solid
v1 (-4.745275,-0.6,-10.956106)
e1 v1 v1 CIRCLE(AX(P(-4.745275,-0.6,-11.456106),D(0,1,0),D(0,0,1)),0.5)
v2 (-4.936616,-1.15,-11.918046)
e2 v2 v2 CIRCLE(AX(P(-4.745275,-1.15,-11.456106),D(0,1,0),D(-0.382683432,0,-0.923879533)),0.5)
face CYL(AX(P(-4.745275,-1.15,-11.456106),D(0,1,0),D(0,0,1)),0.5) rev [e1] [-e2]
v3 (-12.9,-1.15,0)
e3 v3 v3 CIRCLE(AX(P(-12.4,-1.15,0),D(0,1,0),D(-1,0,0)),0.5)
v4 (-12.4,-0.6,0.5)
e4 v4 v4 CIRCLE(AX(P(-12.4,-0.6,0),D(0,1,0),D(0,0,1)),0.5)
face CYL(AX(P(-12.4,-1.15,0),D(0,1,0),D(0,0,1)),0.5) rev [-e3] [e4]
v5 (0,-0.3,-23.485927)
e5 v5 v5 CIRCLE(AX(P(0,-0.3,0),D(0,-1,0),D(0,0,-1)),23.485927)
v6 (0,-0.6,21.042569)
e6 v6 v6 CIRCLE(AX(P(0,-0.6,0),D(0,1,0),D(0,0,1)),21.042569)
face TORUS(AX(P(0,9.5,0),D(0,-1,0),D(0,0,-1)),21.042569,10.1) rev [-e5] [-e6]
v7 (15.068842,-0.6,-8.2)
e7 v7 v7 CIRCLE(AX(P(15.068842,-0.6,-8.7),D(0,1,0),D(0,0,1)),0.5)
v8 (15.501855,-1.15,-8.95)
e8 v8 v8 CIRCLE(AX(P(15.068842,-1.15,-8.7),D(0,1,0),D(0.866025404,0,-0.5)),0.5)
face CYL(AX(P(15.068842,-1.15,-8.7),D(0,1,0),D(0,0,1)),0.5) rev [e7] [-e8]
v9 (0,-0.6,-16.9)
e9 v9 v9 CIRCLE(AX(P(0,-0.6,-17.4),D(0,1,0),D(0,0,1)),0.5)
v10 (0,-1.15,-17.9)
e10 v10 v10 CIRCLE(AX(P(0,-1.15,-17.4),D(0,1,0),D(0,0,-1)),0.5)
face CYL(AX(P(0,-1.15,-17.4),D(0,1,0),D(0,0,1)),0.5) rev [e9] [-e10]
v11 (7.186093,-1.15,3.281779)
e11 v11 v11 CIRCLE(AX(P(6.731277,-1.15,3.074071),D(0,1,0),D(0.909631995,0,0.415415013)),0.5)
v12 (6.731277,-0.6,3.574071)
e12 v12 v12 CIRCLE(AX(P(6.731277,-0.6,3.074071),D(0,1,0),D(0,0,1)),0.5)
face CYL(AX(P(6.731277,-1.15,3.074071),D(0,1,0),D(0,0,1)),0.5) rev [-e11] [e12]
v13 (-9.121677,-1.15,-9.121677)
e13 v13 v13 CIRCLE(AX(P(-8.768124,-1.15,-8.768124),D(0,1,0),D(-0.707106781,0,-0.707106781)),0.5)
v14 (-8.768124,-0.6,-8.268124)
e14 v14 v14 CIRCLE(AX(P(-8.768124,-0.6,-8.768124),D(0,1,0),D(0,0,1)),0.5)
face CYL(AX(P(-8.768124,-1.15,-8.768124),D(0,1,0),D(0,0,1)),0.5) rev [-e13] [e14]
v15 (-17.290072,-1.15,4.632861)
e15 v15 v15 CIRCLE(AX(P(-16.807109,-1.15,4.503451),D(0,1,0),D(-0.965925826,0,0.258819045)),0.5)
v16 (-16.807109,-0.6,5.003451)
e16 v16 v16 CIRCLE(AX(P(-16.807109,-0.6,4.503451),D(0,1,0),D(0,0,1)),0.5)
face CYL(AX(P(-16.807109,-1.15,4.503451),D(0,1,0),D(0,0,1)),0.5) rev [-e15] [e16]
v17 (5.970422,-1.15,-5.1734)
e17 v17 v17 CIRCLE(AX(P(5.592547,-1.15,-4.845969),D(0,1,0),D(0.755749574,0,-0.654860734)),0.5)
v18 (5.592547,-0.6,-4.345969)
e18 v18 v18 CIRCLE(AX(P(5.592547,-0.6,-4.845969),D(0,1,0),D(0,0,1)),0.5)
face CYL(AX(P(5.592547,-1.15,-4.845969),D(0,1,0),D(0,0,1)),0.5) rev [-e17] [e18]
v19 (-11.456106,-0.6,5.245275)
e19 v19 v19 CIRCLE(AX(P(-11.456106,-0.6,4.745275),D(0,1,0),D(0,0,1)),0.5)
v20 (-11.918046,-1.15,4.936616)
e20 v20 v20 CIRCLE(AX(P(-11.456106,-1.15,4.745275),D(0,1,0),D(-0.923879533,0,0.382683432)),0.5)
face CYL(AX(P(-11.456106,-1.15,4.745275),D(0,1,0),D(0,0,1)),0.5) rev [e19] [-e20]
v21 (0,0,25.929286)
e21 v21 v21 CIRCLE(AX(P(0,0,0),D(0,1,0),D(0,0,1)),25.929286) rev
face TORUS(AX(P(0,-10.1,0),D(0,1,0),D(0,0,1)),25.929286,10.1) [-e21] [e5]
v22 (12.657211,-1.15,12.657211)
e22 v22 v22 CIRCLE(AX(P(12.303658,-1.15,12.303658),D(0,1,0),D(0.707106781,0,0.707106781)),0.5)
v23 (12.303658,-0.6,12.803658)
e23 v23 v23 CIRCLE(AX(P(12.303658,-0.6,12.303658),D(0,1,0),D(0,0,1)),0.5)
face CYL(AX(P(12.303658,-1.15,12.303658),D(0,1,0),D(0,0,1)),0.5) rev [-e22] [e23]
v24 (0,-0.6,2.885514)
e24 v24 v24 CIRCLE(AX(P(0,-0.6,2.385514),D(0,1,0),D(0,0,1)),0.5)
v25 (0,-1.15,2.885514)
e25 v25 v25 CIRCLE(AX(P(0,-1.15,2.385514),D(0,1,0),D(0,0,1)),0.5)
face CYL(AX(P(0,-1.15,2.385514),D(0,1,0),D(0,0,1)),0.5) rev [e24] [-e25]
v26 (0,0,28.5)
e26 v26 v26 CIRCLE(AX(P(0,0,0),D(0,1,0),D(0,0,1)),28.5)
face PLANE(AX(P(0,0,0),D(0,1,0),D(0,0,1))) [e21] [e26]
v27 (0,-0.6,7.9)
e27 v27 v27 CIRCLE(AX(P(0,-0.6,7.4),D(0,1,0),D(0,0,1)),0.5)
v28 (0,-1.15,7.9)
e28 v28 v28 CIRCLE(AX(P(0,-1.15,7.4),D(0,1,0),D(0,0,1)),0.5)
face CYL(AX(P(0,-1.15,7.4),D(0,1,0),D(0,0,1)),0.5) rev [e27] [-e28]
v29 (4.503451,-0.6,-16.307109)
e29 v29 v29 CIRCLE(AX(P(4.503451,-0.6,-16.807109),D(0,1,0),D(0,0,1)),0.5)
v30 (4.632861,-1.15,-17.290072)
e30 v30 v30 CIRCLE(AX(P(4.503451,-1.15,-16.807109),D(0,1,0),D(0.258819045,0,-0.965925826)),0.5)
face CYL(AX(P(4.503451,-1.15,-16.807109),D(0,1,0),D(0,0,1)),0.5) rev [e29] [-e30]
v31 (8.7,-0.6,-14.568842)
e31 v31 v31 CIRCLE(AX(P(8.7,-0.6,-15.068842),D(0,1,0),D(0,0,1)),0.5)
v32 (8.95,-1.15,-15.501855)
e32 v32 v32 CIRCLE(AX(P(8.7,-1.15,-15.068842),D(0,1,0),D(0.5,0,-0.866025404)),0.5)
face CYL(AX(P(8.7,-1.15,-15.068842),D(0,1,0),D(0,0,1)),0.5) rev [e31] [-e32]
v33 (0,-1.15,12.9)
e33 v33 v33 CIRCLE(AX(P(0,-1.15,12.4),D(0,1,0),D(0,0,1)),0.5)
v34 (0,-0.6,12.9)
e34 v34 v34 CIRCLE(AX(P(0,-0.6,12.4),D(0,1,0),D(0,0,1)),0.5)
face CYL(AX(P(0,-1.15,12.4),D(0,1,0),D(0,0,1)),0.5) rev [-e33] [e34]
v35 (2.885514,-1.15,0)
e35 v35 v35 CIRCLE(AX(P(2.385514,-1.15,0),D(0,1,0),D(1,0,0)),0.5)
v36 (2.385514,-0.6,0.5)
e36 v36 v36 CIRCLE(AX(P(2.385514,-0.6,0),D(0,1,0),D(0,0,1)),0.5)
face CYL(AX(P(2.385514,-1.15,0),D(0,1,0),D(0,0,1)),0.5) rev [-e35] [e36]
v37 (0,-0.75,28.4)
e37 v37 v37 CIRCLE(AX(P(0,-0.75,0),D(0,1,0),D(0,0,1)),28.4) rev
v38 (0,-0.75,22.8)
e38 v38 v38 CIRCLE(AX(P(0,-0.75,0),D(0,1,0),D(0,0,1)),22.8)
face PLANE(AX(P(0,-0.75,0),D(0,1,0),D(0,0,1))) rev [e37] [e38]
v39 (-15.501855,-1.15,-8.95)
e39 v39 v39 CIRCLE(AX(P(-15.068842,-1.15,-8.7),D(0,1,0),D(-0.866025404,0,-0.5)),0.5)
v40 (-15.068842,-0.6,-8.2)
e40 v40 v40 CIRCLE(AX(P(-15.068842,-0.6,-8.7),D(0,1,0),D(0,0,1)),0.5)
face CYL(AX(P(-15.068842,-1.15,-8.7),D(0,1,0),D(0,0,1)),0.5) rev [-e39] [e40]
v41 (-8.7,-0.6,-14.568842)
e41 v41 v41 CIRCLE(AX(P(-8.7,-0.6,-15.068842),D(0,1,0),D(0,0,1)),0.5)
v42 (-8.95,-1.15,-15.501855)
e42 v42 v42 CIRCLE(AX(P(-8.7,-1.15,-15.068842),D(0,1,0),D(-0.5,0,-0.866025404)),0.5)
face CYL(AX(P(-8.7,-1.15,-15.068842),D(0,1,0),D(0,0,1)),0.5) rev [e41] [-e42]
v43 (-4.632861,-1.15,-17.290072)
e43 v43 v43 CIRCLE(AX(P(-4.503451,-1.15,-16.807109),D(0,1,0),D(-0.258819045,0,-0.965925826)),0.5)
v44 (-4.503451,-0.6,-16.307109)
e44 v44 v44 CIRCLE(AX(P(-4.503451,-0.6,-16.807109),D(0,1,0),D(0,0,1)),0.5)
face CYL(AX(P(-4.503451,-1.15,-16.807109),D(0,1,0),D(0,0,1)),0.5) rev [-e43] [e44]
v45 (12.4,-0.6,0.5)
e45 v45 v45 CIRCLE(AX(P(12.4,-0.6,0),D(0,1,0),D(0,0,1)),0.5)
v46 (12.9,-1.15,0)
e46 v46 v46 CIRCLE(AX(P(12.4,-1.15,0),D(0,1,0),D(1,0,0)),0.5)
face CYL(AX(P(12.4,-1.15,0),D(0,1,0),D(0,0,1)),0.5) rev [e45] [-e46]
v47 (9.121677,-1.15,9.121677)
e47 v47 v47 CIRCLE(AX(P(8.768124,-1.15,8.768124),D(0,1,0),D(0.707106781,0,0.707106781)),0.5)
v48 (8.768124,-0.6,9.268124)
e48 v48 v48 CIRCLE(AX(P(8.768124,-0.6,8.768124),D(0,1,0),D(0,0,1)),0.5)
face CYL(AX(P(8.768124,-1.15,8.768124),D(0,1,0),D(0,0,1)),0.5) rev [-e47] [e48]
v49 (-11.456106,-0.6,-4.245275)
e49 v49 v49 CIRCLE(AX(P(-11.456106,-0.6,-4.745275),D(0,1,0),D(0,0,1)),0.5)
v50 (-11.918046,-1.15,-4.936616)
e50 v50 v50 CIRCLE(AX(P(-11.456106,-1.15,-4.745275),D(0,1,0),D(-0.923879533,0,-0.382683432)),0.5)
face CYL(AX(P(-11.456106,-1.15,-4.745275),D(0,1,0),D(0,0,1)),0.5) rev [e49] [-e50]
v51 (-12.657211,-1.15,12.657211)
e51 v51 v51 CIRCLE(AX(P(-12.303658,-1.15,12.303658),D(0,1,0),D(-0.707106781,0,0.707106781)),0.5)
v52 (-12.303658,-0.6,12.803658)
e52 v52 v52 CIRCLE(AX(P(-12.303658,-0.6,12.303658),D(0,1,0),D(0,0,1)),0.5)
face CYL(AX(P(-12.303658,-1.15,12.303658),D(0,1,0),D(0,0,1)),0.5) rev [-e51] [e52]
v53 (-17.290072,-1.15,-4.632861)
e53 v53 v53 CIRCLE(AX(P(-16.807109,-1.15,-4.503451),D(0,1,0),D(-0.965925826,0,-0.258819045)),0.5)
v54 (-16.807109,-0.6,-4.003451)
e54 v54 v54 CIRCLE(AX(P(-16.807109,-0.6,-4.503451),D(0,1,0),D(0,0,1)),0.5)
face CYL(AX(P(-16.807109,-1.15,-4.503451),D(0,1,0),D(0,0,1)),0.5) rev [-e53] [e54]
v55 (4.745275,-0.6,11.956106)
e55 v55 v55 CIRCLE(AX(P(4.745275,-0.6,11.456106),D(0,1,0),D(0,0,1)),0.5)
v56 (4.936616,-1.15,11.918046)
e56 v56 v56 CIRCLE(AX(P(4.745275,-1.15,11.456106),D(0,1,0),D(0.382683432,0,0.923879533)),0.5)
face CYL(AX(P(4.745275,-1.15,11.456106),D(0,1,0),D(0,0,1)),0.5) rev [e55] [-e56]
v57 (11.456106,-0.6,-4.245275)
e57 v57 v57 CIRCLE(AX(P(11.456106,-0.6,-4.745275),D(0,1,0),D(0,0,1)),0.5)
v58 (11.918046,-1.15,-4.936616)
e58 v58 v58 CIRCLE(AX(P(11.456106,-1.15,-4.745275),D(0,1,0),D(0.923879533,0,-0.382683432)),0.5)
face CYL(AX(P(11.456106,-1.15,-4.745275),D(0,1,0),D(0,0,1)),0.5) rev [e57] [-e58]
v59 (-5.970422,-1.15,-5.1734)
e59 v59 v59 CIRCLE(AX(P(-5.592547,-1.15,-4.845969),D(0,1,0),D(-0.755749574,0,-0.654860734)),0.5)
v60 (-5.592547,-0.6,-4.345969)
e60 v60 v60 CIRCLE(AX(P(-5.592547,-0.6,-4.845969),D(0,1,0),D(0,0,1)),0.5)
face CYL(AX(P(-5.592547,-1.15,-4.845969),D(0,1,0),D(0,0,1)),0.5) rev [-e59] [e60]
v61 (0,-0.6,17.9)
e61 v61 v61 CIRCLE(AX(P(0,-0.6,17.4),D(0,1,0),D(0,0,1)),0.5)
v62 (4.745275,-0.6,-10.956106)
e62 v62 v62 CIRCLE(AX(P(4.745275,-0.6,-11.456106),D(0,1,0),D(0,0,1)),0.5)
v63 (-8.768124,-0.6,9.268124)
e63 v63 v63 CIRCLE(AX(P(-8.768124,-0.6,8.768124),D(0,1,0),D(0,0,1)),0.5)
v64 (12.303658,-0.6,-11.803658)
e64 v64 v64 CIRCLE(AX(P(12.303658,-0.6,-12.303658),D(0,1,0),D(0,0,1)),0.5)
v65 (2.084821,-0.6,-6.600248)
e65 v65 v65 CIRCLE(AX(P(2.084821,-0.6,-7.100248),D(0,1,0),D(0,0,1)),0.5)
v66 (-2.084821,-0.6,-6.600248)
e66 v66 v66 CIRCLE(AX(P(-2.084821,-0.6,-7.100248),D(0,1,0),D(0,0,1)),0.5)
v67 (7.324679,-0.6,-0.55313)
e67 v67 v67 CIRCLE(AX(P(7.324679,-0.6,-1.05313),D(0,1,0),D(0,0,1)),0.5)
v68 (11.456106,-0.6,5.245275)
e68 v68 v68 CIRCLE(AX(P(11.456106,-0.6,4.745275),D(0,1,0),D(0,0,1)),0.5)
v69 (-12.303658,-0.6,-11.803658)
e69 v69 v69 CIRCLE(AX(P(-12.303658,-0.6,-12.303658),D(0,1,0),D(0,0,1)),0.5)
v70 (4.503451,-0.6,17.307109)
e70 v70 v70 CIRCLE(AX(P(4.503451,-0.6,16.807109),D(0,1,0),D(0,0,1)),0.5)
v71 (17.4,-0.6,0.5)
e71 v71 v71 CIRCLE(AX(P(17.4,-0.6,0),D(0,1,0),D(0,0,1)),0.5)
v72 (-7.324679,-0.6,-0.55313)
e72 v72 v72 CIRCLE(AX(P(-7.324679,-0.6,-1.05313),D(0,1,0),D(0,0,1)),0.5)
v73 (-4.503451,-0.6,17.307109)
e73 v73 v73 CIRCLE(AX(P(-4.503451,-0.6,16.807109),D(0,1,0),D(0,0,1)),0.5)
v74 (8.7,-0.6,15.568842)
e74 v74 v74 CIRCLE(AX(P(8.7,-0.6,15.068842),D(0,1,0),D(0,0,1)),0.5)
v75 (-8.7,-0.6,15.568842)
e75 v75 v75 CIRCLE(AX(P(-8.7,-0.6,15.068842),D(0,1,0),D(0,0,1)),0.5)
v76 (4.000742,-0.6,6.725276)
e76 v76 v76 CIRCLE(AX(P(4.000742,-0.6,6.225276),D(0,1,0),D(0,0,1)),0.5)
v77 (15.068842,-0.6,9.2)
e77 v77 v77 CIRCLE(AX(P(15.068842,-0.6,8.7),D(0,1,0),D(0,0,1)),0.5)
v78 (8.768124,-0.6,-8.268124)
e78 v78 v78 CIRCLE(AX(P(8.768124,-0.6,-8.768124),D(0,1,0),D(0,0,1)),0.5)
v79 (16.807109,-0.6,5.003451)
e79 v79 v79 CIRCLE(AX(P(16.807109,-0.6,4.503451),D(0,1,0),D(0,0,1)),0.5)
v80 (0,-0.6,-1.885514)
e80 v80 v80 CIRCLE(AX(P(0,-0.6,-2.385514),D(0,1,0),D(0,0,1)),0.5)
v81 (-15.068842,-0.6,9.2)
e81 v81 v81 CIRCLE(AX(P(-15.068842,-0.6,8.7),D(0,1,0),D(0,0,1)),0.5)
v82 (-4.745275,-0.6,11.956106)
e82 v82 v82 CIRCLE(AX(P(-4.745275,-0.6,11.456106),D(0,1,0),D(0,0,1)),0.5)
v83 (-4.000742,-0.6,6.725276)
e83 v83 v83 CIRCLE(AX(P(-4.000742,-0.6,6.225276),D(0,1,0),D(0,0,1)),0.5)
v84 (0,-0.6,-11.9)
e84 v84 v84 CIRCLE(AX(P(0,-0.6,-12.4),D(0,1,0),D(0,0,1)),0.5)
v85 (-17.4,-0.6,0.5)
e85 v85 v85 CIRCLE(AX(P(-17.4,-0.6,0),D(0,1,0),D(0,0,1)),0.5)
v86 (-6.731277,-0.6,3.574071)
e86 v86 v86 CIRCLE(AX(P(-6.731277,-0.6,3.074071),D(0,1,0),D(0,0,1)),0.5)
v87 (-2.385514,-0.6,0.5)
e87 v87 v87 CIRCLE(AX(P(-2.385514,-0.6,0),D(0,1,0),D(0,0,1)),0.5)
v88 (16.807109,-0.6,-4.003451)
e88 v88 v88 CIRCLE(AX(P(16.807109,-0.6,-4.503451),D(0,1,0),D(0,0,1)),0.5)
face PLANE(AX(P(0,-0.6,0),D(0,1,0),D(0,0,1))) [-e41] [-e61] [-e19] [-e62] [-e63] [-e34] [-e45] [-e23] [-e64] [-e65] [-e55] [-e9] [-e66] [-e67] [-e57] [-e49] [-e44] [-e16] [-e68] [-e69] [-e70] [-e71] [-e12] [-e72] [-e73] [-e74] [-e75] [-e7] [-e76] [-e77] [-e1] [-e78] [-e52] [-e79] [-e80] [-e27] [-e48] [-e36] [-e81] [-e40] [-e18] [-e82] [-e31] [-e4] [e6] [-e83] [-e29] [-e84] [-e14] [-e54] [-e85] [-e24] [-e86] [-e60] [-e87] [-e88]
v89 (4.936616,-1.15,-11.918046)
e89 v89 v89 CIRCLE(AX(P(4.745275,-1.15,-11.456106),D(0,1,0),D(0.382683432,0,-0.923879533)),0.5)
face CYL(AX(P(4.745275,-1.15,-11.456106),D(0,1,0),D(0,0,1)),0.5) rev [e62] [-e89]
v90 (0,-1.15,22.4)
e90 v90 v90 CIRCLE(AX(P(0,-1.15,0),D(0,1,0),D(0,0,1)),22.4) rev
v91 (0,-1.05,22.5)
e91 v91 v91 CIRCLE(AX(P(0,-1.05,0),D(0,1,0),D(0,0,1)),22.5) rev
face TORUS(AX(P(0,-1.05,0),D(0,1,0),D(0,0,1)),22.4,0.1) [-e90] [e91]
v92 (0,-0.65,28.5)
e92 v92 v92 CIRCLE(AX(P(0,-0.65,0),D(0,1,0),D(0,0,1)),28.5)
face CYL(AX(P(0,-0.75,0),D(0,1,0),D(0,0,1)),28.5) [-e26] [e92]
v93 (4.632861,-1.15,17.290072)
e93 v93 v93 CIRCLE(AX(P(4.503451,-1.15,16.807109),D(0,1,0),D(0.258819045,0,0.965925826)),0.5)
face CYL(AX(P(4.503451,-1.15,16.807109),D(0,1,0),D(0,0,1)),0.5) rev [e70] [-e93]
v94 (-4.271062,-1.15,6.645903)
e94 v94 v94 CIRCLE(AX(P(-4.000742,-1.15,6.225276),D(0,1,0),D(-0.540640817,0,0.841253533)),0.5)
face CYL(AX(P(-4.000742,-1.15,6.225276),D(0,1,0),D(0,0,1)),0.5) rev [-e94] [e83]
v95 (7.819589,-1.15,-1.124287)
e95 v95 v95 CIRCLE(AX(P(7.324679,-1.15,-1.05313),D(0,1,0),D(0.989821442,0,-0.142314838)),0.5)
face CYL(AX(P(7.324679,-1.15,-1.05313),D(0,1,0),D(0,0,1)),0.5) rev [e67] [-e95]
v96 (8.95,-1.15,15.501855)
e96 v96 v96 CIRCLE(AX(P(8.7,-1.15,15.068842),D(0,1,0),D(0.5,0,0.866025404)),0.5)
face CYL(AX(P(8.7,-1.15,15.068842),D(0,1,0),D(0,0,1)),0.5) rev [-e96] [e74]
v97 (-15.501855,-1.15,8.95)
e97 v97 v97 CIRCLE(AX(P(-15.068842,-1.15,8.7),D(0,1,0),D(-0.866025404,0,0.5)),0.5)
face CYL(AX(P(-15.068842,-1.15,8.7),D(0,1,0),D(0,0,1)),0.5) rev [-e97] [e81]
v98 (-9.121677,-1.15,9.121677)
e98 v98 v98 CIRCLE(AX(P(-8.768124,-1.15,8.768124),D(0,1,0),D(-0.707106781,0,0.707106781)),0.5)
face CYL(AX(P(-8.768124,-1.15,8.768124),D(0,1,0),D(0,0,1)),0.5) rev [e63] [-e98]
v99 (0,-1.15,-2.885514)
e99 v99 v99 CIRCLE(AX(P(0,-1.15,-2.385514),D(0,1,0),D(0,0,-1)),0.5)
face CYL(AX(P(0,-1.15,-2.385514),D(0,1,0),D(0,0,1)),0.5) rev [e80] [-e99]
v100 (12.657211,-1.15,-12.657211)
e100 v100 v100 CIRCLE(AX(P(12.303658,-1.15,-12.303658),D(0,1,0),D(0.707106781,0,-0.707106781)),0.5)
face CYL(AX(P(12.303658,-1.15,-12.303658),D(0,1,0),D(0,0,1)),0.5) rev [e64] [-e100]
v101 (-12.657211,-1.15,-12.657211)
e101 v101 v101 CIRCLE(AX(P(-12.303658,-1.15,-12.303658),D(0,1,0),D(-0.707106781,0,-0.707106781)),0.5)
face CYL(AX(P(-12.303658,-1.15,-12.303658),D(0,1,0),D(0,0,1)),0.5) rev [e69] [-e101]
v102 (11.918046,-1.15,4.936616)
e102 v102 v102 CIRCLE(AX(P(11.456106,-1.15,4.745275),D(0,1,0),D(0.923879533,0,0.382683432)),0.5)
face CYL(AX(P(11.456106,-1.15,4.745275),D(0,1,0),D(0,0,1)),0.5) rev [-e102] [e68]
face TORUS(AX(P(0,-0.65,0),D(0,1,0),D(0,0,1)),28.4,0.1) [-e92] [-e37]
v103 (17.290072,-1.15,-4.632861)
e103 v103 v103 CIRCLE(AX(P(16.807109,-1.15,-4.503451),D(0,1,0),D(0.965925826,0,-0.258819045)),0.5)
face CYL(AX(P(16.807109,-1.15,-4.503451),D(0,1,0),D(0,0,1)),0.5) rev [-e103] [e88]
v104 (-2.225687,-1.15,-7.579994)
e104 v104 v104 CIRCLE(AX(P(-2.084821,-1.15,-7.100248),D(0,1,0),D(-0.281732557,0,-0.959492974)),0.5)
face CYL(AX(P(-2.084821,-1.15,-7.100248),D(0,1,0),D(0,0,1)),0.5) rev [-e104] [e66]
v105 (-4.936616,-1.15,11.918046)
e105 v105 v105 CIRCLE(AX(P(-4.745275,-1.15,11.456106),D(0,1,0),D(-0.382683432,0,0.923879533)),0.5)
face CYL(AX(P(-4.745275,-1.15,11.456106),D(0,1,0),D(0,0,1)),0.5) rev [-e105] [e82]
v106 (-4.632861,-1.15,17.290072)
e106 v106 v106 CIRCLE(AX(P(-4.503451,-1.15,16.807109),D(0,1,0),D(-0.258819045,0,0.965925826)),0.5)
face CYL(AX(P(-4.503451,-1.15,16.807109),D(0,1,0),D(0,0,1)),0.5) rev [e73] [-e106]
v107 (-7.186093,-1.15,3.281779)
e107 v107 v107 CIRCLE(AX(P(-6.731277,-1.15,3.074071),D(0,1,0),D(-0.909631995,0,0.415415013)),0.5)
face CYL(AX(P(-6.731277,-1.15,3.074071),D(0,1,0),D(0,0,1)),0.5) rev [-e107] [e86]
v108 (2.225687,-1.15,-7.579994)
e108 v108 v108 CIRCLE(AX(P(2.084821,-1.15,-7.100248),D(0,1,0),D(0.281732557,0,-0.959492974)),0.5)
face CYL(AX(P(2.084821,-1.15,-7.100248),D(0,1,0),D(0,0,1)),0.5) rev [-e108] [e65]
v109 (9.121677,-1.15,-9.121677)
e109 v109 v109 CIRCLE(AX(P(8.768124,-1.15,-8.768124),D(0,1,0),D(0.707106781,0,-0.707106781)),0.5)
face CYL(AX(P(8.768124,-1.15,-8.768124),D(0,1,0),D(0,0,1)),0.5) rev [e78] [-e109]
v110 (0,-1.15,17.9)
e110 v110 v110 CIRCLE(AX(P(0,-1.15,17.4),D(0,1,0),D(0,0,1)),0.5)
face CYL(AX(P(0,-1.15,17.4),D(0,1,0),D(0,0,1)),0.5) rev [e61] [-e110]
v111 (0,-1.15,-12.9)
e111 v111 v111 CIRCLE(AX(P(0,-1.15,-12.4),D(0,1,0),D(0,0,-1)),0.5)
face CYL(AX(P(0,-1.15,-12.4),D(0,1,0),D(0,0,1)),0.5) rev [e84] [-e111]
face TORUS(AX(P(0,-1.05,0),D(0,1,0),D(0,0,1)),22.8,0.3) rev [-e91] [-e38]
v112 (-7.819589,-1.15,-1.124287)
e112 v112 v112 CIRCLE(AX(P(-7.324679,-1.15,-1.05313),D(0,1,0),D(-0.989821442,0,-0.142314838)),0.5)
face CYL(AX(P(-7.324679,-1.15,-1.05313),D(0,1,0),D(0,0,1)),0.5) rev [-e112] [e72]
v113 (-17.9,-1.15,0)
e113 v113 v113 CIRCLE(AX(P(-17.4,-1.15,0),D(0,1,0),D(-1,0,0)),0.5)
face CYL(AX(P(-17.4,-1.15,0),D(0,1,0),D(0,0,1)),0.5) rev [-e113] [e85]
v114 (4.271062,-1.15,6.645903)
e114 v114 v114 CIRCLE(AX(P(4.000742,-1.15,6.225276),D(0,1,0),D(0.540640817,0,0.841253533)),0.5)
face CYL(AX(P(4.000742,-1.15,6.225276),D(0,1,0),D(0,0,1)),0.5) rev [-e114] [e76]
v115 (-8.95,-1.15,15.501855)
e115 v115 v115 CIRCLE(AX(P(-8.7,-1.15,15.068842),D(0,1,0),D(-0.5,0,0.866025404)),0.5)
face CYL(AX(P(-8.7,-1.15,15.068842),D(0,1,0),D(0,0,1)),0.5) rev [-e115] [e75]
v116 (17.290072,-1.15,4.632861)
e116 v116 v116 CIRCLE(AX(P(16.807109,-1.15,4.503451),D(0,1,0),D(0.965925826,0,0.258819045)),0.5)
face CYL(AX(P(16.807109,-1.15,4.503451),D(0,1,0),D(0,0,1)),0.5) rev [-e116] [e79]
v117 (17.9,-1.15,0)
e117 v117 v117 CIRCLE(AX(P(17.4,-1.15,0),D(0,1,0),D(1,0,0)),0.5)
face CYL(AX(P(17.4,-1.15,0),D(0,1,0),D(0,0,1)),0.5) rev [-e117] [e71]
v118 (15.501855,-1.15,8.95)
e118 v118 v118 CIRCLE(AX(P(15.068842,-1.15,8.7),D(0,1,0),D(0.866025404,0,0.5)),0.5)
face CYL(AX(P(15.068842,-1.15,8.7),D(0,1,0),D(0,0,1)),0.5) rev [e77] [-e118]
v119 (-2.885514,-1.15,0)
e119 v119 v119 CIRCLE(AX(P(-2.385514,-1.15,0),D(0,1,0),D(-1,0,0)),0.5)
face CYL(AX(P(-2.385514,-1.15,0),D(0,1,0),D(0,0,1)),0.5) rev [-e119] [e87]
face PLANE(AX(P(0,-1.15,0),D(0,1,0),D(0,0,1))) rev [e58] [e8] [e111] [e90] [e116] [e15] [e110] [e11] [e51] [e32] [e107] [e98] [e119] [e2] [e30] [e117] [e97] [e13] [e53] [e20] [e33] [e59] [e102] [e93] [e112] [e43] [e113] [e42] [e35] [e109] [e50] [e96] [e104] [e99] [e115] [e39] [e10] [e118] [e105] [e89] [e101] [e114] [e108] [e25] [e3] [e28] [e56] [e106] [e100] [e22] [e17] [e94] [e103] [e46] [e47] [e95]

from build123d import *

# Parameters (mm, degrees)
SKETCH1_R             = 28.5
BOSS_EXTRUDE1_DEPTH   = 0.75
SKETCH2_R             = 22.5
BOSS_EXTRUDE2_DEPTH   = 0.4
FILLET1_R             = 0.3
FILLET2_R             = 0.1
FILLET3_R             = 0.1
SKETCH3_R             = 22.5
CUT_EXTRUDE1_DEPTH    = 0.6
FILLET4_R             = 10.1
FILLET5_R             = 10.1
SKETCH6_R             = 0.5
CUT_EXTRUDE3_DEPTH    = 41.321489308
CIRPATTERN1_START     = -1.15
CIRPATTERN1_OUTLINE_R = 0.5
CIRPATTERN1_DEPTH     = 0.55
SKETCH7_R             = 0.5
CUT_EXTRUDE4_DEPTH    = 41.321489308
CIRPATTERN2_COUNT     = 16
SKETCH8_R             = 0.5
CUT_EXTRUDE5_DEPTH    = 41.321489308
CIRPATTERN3_COUNT     = 11
SKETCH9_R             = 0.5
CUT_EXTRUDE6_DEPTH    = 41.321489308
CIRPATTERN4_COUNT     = 4


with BuildPart() as part:
    # Sketch1 → Boss-Extrude1 (new body)
    with BuildSketch(Plane(origin=(0, 0, 0), x_dir=(1, 0, 0), z_dir=(0, 1, 0))):
        with Locations(Location((0, 0, 0), (0, 0, 270))):
            Circle(SKETCH1_R)
    extrude(amount=-BOSS_EXTRUDE1_DEPTH)

    # Sketch2 → Boss-Extrude2 (add)
    with BuildSketch(Plane(origin=(0, -0.75, 0), x_dir=(1, 0, 0), z_dir=(0, 1, 0))):
        with Locations(Location((0, 0, 0), (0, 0, 270))):
            Circle(SKETCH2_R)
    extrude(amount=-BOSS_EXTRUDE2_DEPTH)

    # Fillet1
    fillet1_edges = [part.edges().sort_by_distance(p)[0] for p in [
        (0, -0.75, -22.5),
    ]]
    fillet(fillet1_edges, radius=FILLET1_R)

    # Fillet2
    fillet2_edges = [part.edges().sort_by_distance(p)[0] for p in [
        (0, -1.15, -22.5),
    ]]
    fillet(fillet2_edges, radius=FILLET2_R - 0.0001)  # a hair under: the kernel refuses the full size

    # Fillet3
    fillet3_edges = [part.edges().sort_by_distance(p)[0] for p in [
        (0, -0.75, -28.5),
    ]]
    fillet(fillet3_edges, radius=FILLET3_R)

    # Sketch3 → Cut-Extrude1 (cut)
    with BuildSketch(Plane(origin=(0, 0, 0), x_dir=(1, 0, 0), z_dir=(0, 1, 0))):
        with Locations(Location((0, 0, 0), (0, 0, 270))):
            Circle(SKETCH3_R)
    extrude(amount=-CUT_EXTRUDE1_DEPTH, mode=Mode.SUBTRACT)

    # Fillet4
    # the kernel refuses this fillet: 10.1 mm, written as the material it takes off along each edge
    with BuildSketch(Plane(origin=(0, 0, 0), x_dir=(0, 0, 1), z_dir=(-1, 0, 0))) as fillet4_piece_1:
        with BuildLine():
            CenterArc((25.92928564, -10.1), FILLET4_R, 90, 19.848438581)
            Line((22.5, -0.6), (22.5, 0))
            Line((22.5, 0), (25.92928564, 0))
        make_face()
    revolve(axis=Axis((0, 0, 0), (0, 1, 0)), mode=Mode.SUBTRACT)

    # Fillet5
    fillet5_edges = [part.edges().sort_by_distance(p)[0] for p in [
        (0, -0.6, -22.5),
    ]]
    fillet(fillet5_edges, radius=FILLET5_R)

    # Sketch6 → Cut-Extrude3 (cut, symmetric)
    with BuildSketch(Plane(origin=(0, 0, 0), x_dir=(1, 0, 0), z_dir=(0, 1, 0))):
        with Locations(Location((0, -17.4, 0), (0, 0, 270))):
            Circle(SKETCH6_R)
    extrude(amount=CUT_EXTRUDE3_DEPTH, both=True, mode=Mode.SUBTRACT)

    # CirPattern1: read off the stored shape, not the designer's step
    # CirPattern1 outline → CirPattern1 (cut)
    with BuildSketch(Plane(origin=(0, 0, 0), x_dir=(1, 0, 0), z_dir=(0, 1, 0)).offset(CIRPATTERN1_START)):
        with Locations((-4.503451385, -16.807109377)):
            Circle(CIRPATTERN1_OUTLINE_R)
        with Locations((4.503451385, -16.807109377)):
            Circle(CIRPATTERN1_OUTLINE_R)
        with Locations((8.7, -15.068842026)):
            Circle(CIRPATTERN1_OUTLINE_R)
        with Locations((12.303657993, -12.303657993)):
            Circle(CIRPATTERN1_OUTLINE_R)
        with Locations((15.068842026, -8.7)):
            Circle(CIRPATTERN1_OUTLINE_R)
        with Locations((16.807109377, -4.503451385)):
            Circle(CIRPATTERN1_OUTLINE_R)
        with Locations((17.4, 0)):
            Circle(CIRPATTERN1_OUTLINE_R)
        with Locations((-8.7, -15.068842026)):
            Circle(CIRPATTERN1_OUTLINE_R)
        with Locations((-12.303657993, -12.303657993)):
            Circle(CIRPATTERN1_OUTLINE_R)
        with Locations((-15.068842026, -8.7)):
            Circle(CIRPATTERN1_OUTLINE_R)
        with Locations((-16.807109377, -4.503451385)):
            Circle(CIRPATTERN1_OUTLINE_R)
        with Locations((-17.4, 0)):
            Circle(CIRPATTERN1_OUTLINE_R)
        with Locations((-16.807109377, 4.503451385)):
            Circle(CIRPATTERN1_OUTLINE_R)
        with Locations((-15.068842026, 8.7)):
            Circle(CIRPATTERN1_OUTLINE_R)
        with Locations((-12.303657993, 12.303657993)):
            Circle(CIRPATTERN1_OUTLINE_R)
        with Locations((-8.7, 15.068842026)):
            Circle(CIRPATTERN1_OUTLINE_R)
        with Locations((-4.503451385, 16.807109377)):
            Circle(CIRPATTERN1_OUTLINE_R)
        with Locations((0, 17.4)):
            Circle(CIRPATTERN1_OUTLINE_R)
        with Locations((4.503451385, 16.807109377)):
            Circle(CIRPATTERN1_OUTLINE_R)
        with Locations((8.7, 15.068842026)):
            Circle(CIRPATTERN1_OUTLINE_R)
        with Locations((12.303657993, 12.303657993)):
            Circle(CIRPATTERN1_OUTLINE_R)
        with Locations((15.068842026, 8.7)):
            Circle(CIRPATTERN1_OUTLINE_R)
        with Locations((16.807109377, 4.503451385)):
            Circle(CIRPATTERN1_OUTLINE_R)
    extrude(amount=CIRPATTERN1_DEPTH, mode=Mode.SUBTRACT)

    # Sketch7 → Cut-Extrude4 (cut, symmetric)
    with BuildSketch(Plane(origin=(0, 0, 0), x_dir=(1, 0, 0), z_dir=(0, 1, 0))):
        with Locations(Location((0, -12.4, 0), (0, 0, 270))):
            Circle(SKETCH7_R)
    cut_extrude4 = extrude(amount=CUT_EXTRUDE4_DEPTH, both=True, mode=Mode.SUBTRACT)

    # CirPattern2: Cut-Extrude4 ×16 about axis
    cirpattern2_axis = Axis((0, 0, 0), (0, 1, 0))
    for i in range(1, CIRPATTERN2_COUNT):
        add(cut_extrude4.rotate(cirpattern2_axis, i * 360 / CIRPATTERN2_COUNT), mode=Mode.SUBTRACT)

    # Sketch8 → Cut-Extrude5 (cut, symmetric)
    with BuildSketch(Plane(origin=(0, 0, 0), x_dir=(1, 0, 0), z_dir=(0, 1, 0))):
        with Locations(Location((0, -7.4, 0), (0, 0, 270))):
            Circle(SKETCH8_R)
    cut_extrude5 = extrude(amount=CUT_EXTRUDE5_DEPTH, both=True, mode=Mode.SUBTRACT)

    # CirPattern3: Cut-Extrude5 ×11 about axis
    cirpattern3_axis = Axis((0, 0, 0), (0, 1, 0))
    for i in range(1, CIRPATTERN3_COUNT):
        add(cut_extrude5.rotate(cirpattern3_axis, i * 360 / CIRPATTERN3_COUNT), mode=Mode.SUBTRACT)

    # Sketch9 → Cut-Extrude6 (cut, symmetric)
    with BuildSketch(Plane(origin=(0, 0, 0), x_dir=(1, 0, 0), z_dir=(0, 1, 0))):
        with Locations(Location((0, -2.385513904, 0), (0, 0, 270))):
            Circle(SKETCH9_R)
    cut_extrude6 = extrude(amount=CUT_EXTRUDE6_DEPTH, both=True, mode=Mode.SUBTRACT)

    # CirPattern4: Cut-Extrude6 ×4 about axis
    cirpattern4_axis = Axis((0, 0, 0), (0, 1, 0))
    for i in range(1, CIRPATTERN4_COUNT):
        add(cut_extrude6.rotate(cirpattern4_axis, i * 360 / CIRPATTERN4_COUNT), mode=Mode.SUBTRACT)


solid = part.part
